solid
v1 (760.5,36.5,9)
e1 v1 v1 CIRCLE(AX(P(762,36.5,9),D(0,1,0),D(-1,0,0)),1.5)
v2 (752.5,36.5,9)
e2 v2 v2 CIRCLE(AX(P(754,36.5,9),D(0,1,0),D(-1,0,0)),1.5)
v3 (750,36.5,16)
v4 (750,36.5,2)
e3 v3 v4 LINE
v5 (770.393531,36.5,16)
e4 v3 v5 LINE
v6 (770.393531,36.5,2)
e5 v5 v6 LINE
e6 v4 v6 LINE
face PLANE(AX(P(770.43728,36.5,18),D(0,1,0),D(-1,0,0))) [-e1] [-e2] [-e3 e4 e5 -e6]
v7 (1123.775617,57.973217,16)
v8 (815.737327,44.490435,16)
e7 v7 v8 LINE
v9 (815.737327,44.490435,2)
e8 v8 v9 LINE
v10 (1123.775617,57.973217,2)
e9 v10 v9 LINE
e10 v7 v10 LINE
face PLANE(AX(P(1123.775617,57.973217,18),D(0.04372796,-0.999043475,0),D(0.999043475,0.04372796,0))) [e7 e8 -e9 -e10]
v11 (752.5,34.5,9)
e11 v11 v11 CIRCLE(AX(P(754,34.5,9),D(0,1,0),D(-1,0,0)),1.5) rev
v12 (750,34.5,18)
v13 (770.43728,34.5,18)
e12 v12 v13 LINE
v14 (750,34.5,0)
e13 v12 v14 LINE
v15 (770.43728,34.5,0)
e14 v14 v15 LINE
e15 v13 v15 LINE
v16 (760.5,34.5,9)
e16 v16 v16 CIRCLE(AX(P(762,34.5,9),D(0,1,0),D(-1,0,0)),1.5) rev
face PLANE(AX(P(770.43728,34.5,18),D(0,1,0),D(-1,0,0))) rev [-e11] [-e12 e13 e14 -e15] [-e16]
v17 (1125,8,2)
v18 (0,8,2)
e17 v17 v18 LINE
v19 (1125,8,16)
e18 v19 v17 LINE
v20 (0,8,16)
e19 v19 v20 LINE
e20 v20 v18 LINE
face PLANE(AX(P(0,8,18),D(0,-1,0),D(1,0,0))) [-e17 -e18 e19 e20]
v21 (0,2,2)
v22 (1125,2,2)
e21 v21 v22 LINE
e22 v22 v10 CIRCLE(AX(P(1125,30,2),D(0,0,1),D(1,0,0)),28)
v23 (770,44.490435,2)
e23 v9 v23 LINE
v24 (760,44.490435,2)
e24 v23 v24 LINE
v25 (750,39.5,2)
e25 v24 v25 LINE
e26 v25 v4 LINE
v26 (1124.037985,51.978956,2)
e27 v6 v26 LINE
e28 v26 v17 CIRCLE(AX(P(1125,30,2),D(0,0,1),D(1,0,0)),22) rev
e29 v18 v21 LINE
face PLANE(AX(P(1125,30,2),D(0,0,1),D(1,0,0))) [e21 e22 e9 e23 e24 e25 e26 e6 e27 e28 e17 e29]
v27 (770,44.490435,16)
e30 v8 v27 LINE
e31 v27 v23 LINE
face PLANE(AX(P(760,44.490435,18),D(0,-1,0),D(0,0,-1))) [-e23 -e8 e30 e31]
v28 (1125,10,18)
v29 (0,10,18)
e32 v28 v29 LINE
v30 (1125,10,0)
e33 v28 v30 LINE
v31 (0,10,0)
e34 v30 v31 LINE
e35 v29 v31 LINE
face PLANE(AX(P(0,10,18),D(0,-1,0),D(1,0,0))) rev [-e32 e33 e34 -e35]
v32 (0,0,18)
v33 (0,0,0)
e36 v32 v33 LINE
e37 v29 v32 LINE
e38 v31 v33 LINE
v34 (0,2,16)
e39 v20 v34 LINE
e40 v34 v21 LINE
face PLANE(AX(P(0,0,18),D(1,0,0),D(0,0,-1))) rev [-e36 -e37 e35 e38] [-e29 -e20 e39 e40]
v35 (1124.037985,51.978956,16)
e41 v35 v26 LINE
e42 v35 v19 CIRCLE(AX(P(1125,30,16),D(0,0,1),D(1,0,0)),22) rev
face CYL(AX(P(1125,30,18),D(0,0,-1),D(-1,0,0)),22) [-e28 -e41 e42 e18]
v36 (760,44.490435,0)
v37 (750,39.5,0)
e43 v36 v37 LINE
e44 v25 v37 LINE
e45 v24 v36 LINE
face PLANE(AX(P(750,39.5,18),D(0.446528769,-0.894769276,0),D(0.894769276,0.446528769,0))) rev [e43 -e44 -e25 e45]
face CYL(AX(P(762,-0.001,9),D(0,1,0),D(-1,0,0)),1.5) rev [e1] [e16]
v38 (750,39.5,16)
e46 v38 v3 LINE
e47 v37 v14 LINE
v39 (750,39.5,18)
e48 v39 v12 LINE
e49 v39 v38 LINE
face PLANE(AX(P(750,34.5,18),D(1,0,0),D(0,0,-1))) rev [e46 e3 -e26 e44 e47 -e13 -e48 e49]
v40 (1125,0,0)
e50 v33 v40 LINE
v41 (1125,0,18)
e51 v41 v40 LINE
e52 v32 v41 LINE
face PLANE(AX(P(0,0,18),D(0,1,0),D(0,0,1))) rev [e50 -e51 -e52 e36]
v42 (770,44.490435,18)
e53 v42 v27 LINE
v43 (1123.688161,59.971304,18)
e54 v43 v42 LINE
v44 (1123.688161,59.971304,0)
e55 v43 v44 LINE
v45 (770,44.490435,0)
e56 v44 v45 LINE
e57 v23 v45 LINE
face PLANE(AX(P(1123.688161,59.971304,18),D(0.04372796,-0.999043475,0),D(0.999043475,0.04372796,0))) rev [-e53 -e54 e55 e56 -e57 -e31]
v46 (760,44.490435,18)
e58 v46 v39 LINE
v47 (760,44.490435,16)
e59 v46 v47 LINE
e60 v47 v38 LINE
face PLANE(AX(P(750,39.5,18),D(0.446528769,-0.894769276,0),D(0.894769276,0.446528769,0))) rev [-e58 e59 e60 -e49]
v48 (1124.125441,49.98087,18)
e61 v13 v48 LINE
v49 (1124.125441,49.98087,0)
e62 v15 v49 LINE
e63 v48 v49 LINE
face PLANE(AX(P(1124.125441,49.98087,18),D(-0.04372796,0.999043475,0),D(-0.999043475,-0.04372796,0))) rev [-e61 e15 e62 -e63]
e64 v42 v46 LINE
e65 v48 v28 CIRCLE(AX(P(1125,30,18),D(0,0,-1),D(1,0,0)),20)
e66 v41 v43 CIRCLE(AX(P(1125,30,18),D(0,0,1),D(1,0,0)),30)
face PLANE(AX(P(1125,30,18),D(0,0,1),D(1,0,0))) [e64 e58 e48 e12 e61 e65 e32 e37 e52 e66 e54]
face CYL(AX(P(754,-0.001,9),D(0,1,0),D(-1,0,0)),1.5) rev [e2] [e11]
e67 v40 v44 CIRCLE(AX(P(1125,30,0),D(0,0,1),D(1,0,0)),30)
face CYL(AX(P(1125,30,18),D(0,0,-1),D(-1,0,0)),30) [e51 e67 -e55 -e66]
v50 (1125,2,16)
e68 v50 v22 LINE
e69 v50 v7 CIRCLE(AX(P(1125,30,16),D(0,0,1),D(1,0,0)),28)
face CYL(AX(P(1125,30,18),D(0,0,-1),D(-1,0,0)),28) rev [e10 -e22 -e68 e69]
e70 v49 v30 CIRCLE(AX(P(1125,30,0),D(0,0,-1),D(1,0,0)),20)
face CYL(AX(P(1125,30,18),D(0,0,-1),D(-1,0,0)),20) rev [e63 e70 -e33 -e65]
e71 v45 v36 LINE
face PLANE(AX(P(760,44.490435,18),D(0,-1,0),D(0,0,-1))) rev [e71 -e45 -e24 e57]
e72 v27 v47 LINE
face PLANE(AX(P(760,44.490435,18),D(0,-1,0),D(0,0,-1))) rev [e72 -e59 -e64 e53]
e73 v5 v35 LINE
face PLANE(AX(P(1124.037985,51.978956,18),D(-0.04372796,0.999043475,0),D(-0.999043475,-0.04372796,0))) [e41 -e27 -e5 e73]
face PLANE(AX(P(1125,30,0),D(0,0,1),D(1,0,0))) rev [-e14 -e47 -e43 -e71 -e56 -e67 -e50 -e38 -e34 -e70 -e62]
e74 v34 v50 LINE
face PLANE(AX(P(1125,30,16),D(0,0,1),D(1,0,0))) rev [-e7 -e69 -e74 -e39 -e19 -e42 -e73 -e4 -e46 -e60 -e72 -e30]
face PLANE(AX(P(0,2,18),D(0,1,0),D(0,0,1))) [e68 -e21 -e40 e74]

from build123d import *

# Parameters (mm, degrees)
BOSS_EXTRUDE1_DEPTH = 18
SHELL1_START        = 2
SHELL1_DEPTH        = 14
CUT_EXTRUDE1_REACH  = 1157.717
SKETCH2_R           = 1.5


# Read off the part's stored shape, not the designer's step: Shell1
with BuildPart() as part:
    # Sketch1 → Boss-Extrude1 (new body)
    with BuildSketch(Plane.XY):
        with BuildLine():
            Line((0, 0), (1125, 0))
            ThreePointArc((1125, 0), (1154.992825207, 30.656076303), (1123.688161208, 59.971304259))
            Line((1123.688161208, 59.971304259), (770, 44.490434753))
            Line((770, 44.490434753), (760, 44.490434753))
            Line((760, 44.490434753), (750, 39.5))
            Line((750, 39.5), (750, 34.5))
            Line((750, 34.5), (770.437279597, 34.5))
            Line((770.437279597, 34.5), (1124.125440805, 49.980869506))
            ThreePointArc((1124.125440805, 49.980869506), (1144.995216805, 30.437384202), (1125, 10))
            Line((1125, 10), (0, 10))
            Line((0, 10), (0, 0))
        make_face()
    extrude(amount=BOSS_EXTRUDE1_DEPTH)

    # Shell1 outline → Shell1 (cut)
    with BuildSketch(Plane.XY.offset(SHELL1_START)):
        with BuildLine():
            Line((815.73732715, 44.490434753), (760, 44.490434753))
            Line((760, 44.490434753), (750, 39.5))
            Line((750, 39.5), (750, 36.5))
            Line((750, 36.5), (770.393530714, 36.5))
            Line((770.393530714, 36.5), (1124.037984886, 51.978956457))
            ThreePointArc((1124.037984886, 51.978956457), (1146.994738485, 30.481122622), (1125, 8))
            Line((1125, 8), (0, 8))
            Line((0, 8), (0, 2))
            Line((0, 2), (1125, 2))
            ThreePointArc((1125, 2), (1152.993303526, 30.612337883), (1123.775617127, 57.973217308))
            Line((1123.775617127, 57.973217308), (815.73732715, 44.490434753))
        make_face()
    extrude(amount=SHELL1_DEPTH, mode=Mode.SUBTRACT)

    # Sketch2 → Cut-Extrude1 (cut, up to next)
    with BuildSketch(Plane(origin=(0, 36.5, 0), x_dir=(1, 0, 0), z_dir=(0, 1, 0)), mode=Mode.PRIVATE) as cut_extrude1_sk1:
        with Locations(Location((754, -9, 0), (0, 0, 180))):
            Circle(SKETCH2_R)
    cut_extrude1_tool1 = extrude(cut_extrude1_sk1.sketch, amount=-CUT_EXTRUDE1_REACH, mode=Mode.PRIVATE) & part.part
    # Sketch2 → Cut-Extrude1 (cut, up to next)
    with BuildSketch(Plane(origin=(0, 36.5, 0), x_dir=(1, 0, 0), z_dir=(0, 1, 0)), mode=Mode.PRIVATE) as cut_extrude1_sk2:
        with Locations(Location((762, -9, 0), (0, 0, 180))):
            Circle(SKETCH2_R)
    cut_extrude1_tool2 = extrude(cut_extrude1_sk2.sketch, amount=-CUT_EXTRUDE1_REACH, mode=Mode.PRIVATE) & part.part
    add(cut_extrude1_tool1.solids().sort_by_distance((754, 36.5, 9))[0], mode=Mode.SUBTRACT)
    add(cut_extrude1_tool2.solids().sort_by_distance((762, 36.5, 9))[0], mode=Mode.SUBTRACT)


solid = part.part
